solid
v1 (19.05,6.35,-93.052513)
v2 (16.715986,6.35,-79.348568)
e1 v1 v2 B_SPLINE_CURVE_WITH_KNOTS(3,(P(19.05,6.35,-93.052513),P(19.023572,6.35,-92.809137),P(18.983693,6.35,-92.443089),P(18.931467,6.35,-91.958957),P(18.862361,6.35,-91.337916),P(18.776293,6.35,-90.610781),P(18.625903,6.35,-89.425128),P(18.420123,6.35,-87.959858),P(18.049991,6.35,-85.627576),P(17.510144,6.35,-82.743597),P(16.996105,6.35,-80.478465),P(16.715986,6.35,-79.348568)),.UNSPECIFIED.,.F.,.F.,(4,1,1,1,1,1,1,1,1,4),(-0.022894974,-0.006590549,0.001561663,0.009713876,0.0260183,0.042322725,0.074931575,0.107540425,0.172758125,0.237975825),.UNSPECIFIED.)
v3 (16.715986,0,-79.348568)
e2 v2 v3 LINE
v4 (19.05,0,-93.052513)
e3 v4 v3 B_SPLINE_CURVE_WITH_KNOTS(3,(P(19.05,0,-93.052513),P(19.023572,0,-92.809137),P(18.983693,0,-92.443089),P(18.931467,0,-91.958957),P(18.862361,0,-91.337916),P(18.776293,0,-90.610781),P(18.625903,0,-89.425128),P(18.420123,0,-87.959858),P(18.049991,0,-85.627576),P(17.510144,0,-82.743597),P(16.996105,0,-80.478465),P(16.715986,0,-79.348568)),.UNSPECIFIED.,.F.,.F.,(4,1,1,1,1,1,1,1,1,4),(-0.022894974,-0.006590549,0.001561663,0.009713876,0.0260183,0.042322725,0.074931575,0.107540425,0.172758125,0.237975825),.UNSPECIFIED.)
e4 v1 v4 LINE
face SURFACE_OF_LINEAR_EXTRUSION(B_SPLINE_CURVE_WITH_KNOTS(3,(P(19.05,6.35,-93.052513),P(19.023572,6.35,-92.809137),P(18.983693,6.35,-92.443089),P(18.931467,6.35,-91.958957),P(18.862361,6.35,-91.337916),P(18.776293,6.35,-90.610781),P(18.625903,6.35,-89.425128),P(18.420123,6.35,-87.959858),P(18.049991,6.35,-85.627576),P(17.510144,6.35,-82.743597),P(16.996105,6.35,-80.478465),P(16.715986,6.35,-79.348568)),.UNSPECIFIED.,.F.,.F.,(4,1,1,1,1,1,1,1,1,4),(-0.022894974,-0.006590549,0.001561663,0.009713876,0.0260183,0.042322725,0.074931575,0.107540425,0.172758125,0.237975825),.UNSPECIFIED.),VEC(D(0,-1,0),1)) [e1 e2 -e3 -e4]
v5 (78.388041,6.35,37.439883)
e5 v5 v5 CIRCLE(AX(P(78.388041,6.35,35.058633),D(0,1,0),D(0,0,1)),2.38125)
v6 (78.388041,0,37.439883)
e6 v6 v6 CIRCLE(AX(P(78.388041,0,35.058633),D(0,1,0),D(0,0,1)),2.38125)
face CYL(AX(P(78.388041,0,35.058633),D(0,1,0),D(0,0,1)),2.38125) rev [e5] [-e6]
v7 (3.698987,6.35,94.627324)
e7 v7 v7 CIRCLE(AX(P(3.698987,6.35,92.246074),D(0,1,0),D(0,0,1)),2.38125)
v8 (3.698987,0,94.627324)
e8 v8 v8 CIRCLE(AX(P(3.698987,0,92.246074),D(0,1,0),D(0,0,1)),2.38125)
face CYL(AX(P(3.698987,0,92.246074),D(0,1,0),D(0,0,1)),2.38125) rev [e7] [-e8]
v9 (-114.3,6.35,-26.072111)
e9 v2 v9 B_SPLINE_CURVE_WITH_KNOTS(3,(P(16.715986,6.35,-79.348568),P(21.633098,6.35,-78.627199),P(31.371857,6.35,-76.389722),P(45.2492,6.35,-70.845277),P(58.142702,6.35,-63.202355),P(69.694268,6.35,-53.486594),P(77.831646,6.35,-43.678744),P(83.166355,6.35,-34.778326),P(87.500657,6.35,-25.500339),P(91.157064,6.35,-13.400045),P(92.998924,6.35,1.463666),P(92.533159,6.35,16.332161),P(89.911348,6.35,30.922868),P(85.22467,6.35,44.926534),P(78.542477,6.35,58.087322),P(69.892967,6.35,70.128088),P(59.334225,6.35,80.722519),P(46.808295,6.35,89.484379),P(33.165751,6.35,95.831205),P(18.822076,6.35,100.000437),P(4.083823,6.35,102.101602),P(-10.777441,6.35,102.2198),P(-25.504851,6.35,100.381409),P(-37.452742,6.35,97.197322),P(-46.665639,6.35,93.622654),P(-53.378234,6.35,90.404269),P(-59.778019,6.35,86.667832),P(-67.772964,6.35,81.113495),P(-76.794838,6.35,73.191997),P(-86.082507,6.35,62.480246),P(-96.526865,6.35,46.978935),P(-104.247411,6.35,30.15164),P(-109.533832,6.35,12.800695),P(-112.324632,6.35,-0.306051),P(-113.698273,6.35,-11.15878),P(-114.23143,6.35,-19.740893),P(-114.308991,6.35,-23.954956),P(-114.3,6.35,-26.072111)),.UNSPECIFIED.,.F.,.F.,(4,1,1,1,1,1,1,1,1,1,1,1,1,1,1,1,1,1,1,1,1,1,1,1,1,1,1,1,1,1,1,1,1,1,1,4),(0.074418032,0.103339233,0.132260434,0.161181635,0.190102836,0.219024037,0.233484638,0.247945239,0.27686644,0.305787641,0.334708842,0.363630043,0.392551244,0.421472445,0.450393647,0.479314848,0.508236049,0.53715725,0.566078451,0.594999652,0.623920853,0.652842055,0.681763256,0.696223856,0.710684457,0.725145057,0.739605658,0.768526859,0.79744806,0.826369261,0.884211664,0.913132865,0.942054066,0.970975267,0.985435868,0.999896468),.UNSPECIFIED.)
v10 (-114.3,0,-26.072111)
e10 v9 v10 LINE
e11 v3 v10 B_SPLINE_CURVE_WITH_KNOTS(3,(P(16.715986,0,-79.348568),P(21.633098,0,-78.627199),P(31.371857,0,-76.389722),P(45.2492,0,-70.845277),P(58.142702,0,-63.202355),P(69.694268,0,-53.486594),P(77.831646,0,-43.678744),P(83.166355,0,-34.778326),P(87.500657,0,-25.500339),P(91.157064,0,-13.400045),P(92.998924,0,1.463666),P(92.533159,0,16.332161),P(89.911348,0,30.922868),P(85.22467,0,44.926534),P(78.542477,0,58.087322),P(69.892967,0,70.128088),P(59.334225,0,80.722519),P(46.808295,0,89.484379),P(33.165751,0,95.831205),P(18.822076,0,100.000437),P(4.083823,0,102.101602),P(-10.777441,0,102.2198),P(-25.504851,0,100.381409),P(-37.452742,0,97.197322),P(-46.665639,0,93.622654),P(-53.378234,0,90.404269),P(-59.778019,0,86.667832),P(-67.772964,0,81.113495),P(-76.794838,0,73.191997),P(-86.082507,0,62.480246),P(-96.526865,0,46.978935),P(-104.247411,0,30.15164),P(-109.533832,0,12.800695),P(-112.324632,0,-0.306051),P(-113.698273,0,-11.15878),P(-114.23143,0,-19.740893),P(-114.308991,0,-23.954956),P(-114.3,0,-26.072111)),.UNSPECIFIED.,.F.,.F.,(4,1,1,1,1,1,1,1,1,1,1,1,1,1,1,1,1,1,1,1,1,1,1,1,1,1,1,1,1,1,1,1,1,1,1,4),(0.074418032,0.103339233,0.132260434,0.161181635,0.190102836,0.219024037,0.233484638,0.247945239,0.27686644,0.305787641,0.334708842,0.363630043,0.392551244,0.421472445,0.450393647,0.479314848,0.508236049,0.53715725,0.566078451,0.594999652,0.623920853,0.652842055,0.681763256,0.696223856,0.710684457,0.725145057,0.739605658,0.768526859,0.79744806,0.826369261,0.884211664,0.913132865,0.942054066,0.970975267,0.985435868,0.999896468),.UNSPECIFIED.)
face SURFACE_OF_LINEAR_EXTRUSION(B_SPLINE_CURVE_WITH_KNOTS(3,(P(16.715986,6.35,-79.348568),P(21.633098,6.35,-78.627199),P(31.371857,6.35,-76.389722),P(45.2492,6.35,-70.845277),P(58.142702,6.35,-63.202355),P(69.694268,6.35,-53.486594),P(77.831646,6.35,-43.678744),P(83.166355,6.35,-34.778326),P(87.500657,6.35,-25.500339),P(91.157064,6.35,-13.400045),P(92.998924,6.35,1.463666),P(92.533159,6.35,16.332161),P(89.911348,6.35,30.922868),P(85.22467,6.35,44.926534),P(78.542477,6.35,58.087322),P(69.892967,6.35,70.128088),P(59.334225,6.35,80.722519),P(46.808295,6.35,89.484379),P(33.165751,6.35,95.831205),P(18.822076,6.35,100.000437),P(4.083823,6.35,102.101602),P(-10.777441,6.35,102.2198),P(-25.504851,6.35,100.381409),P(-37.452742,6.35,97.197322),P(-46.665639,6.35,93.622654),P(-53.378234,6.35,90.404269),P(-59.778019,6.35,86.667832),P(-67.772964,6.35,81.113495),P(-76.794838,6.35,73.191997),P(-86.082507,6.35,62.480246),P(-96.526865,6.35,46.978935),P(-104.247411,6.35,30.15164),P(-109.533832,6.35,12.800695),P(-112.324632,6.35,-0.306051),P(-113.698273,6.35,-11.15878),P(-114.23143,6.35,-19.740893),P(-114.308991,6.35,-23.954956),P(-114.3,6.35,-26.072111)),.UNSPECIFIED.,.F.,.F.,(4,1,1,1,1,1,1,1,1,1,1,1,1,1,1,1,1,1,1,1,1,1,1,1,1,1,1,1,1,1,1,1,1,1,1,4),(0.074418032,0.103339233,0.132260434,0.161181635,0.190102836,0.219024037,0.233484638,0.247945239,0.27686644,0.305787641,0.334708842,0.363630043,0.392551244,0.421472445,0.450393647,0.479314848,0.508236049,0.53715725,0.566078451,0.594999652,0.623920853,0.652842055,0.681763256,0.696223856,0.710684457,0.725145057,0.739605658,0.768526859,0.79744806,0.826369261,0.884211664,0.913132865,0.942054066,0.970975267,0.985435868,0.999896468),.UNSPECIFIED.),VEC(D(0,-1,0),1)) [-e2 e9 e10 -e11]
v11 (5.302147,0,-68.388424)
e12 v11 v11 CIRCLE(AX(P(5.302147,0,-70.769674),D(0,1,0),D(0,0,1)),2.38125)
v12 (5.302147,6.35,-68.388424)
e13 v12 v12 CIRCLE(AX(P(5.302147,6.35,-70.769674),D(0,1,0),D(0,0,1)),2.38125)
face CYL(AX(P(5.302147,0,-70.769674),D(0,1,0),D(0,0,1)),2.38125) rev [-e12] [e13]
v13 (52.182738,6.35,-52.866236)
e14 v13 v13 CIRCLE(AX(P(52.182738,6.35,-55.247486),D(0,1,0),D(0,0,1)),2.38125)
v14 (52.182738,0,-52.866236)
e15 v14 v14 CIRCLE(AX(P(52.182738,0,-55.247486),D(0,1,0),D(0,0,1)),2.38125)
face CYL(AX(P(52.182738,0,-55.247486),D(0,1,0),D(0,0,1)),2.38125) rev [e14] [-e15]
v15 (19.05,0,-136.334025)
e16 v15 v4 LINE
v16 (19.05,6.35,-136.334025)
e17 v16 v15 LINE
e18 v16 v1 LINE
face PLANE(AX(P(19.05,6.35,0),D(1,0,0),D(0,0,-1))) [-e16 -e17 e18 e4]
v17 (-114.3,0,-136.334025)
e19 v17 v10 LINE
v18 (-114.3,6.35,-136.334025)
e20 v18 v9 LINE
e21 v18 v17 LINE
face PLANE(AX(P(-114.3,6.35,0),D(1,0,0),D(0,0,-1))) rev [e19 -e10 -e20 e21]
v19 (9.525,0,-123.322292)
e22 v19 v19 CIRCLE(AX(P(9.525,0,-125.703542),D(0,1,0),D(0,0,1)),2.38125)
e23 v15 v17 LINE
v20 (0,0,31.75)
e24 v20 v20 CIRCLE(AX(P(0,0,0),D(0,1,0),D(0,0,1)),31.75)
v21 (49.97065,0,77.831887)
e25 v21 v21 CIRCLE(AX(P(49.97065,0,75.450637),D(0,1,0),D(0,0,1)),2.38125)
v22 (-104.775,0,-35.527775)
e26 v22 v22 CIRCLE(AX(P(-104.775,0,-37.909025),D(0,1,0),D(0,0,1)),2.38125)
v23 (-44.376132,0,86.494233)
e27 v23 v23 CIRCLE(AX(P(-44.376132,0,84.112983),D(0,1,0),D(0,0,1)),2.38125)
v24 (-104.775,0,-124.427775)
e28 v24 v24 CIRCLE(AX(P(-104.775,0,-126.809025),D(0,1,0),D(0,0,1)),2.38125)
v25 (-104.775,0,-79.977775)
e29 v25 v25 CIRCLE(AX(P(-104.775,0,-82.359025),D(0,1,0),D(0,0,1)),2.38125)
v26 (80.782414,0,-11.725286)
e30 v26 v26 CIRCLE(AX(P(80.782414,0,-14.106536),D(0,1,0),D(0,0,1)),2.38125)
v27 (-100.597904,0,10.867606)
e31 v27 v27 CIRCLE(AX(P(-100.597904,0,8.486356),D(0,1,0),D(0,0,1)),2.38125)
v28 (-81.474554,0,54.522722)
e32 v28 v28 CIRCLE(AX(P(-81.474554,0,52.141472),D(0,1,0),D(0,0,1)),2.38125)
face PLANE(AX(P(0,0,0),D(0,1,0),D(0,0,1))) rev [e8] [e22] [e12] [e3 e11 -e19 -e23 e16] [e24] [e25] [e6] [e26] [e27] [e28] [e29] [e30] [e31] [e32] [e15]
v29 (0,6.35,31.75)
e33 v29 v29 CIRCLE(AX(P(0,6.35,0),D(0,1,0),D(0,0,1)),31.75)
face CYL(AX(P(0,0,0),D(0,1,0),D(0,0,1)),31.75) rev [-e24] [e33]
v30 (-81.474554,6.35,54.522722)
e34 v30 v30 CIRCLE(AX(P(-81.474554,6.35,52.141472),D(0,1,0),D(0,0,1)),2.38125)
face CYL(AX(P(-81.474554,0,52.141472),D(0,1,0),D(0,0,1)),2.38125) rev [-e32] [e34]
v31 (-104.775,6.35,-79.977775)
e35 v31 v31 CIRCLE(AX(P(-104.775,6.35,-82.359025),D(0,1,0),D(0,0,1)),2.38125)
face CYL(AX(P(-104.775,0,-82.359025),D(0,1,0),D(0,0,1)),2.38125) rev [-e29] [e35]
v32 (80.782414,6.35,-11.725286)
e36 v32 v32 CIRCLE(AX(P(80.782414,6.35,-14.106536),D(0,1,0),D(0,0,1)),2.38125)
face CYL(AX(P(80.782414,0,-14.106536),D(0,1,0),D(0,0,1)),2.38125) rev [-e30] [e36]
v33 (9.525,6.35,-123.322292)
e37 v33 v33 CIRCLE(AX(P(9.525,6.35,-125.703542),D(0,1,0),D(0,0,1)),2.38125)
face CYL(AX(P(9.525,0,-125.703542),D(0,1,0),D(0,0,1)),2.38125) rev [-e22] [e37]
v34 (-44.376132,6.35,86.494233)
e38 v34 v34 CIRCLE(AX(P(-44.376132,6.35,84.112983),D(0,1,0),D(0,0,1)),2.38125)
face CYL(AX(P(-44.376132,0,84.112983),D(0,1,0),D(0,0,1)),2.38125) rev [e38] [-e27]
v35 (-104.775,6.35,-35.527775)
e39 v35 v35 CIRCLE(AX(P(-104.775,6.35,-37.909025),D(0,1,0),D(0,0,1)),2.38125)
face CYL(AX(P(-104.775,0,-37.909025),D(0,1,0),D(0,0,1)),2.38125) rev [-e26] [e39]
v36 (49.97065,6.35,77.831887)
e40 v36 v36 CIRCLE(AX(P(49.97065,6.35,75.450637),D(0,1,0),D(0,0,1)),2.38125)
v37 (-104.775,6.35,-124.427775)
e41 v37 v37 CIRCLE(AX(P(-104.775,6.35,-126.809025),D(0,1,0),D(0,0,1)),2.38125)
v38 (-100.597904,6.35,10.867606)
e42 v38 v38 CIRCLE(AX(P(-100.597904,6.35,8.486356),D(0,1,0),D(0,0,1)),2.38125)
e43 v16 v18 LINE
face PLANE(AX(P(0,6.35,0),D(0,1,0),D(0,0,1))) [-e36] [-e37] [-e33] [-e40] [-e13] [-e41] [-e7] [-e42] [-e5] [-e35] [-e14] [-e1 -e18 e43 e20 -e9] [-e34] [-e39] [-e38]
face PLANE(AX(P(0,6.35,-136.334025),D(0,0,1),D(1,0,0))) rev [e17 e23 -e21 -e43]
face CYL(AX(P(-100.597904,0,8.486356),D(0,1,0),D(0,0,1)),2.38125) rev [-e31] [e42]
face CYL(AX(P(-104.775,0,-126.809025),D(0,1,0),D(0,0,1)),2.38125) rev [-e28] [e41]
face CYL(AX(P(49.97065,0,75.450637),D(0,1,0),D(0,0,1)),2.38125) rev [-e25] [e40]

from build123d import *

# Parameters (mm, degrees)
BOSS_EXTRUDE1_DEPTH   = 6.35
FILLET1_R             = 2.54
FILLET2_R             = 0.79375
SKETCH4_R             = 2.38125
CUT_EXTRUDE3_DEPTH    = 6.35
CRVPATTERN1_OUTLINE_R = 2.38125
CRVPATTERN1_DEPTH     = 6.35
SKETCH5_R             = 31.75
BOSS_EXTRUDE2_DEPTH   = 6.35


# Read off the part's stored shape, not the designer's step: CrvPattern1
with BuildPart() as part:
    # Sketch1 → Boss-Extrude1 (new body)
    with BuildSketch(Plane(origin=(0, 0, 0), x_dir=(1, 0, 0), z_dir=(0, 1, 0))):
        with BuildLine():
            Line((0, 136.334024978), (0, 94.083801247))
            add(Edge.make_bspline(
                [(0, 94.083801247), (-2.431386336, 71.693275709), (-15.75825593, 58.230430146)],
                knots=[0, 0, 0, 1, 1, 1], degree=2))
            add(Edge.make_bspline(
                [(-15.75825593, 58.230430146), (12.928997408, 67.764135595), (70.60122301, 46.247103047), (77.540383798, -26.213493844), (40.518788725, -85.775261158), (-67.055108572, -88.304279922), (-95.415707681, -10.214485927), (-95.25, 26.030170649)],
                knots=[0, 0, 0, 0, 0.227546357, 0.356849793, 0.49581236, 0.710996888, 1, 1, 1, 1], degree=3))
            Line((-95.25, 26.030170649), (-95.25, 136.334024978))
            Line((-95.25, 136.334024978), (-114.3, 136.334024978))
            Line((-114.3, 136.334024978), (-114.3, 26.072111228))
            add(Edge.make_bspline(
                [(16.715986391, 79.348568009), (21.633097871, 78.62719896), (31.371857261, 76.389721894), (45.249200497, 70.845276961), (58.14270202, 63.202354702), (69.694268499, 53.486594004), (77.831645881, 43.678743898), (83.1663553, 34.778326042), (87.500656656, 25.500338712), (91.157064432, 13.400044888), (92.998924079, -1.463666218), (92.533158628, -16.332160856), (89.911348046, -30.922868008), (85.224669703, -44.926534482), (78.5424766, -58.087321563), (69.892966554, -70.128088223), (59.334225085, -80.722518946), (46.808294676, -89.48437896), (33.165750854, -95.831204537), (18.8220758, -100.00043745), (4.083822861, -102.101602424), (-10.777441223, -102.219799961), (-25.504851136, -100.381408636), (-37.452741503, -97.197322494), (-46.66563909, -93.622653994), (-53.378233983, -90.404269128), (-59.778019163, -86.667831837), (-67.772964247, -81.11349497), (-76.794838317, -73.191996697), (-86.082507199, -62.480245978), (-96.526865188, -46.978935087), (-104.24741081, -30.151640125), (-109.53383183, -12.800694626), (-112.324631517, 0.306051107), (-113.698273493, 11.158780223), (-114.231429958, 19.740893087), (-114.308990648, 23.9549561), (-114.3, 26.072111228)],
                knots=[0.074418032, 0.074418032, 0.074418032, 0.074418032, 0.103339233, 0.132260434, 0.161181635, 0.190102836, 0.219024037, 0.233484638, 0.247945239, 0.27686644, 0.305787641, 0.334708842, 0.363630043, 0.392551244, 0.421472445, 0.450393647, 0.479314848, 0.508236049, 0.53715725, 0.566078451, 0.594999652, 0.623920853, 0.652842055, 0.681763256, 0.696223856, 0.710684457, 0.725145057, 0.739605658, 0.768526859, 0.79744806, 0.826369261, 0.884211664, 0.913132865, 0.942054066, 0.970975267, 0.985435868, 0.999896468, 0.999896468, 0.999896468, 0.999896468], degree=3))
            add(Edge.make_bspline(
                [(19.05, 93.052513121), (19.023571763, 92.809136693), (18.983692868, 92.443089224), (18.931467162, 91.958957236), (18.862360798, 91.337915751), (18.776292871, 90.610780885), (18.625902721, 89.42512839), (18.420122868, 87.959858448), (18.049990563, 85.627575808), (17.510143571, 82.743597147), (16.996105499, 80.478464636), (16.715986391, 79.348568009)],
                knots=[-0.022894974, -0.022894974, -0.022894974, -0.022894974, -0.006590549, 0.001561663, 0.009713876, 0.0260183, 0.042322725, 0.074931575, 0.107540425, 0.172758125, 0.237975825, 0.237975825, 0.237975825, 0.237975825], degree=3))
            Line((19.05, 93.052513121), (19.05, 136.334024978))
            Line((19.05, 136.334024978), (0, 136.334024978))
        make_face()
    extrude(amount=BOSS_EXTRUDE1_DEPTH)

    # Fillet1
    fillet1_edges = [part.edges().sort_by_distance(p)[0] for p in [
        (0, 3.175, -94.083801247),
        (-95.25, 3.175, -26.030170649),
    ]]
    fillet(fillet1_edges, radius=FILLET1_R)

    # Fillet2
    fillet2_edges = [part.edges().sort_by_distance(p)[0] for p in [
        (-15.75825593, 3.175, -58.230430146),
    ]]
    fillet(fillet2_edges, radius=FILLET2_R)

    # Sketch4 → Cut-Extrude3 (cut)
    with BuildSketch(Plane(origin=(0, 6.35, 0), x_dir=(1, 0, 0), z_dir=(0, 1, 0))):
        with Locations(Location((-104.775, 126.809024978, 0), (0, 0, 270))):
            Circle(SKETCH4_R)
    extrude(amount=-CUT_EXTRUDE3_DEPTH, mode=Mode.SUBTRACT)

    # CrvPattern1 outline → CrvPattern1 (cut)
    with BuildSketch(Plane(origin=(0, 0, 0), x_dir=(1, 0, 0), z_dir=(0, 1, 0))):
        with Locations((-104.775, 82.359024978)):
            Circle(CRVPATTERN1_OUTLINE_R)
        with Locations((-104.775, 37.909024978)):
            Circle(CRVPATTERN1_OUTLINE_R)
        with Locations((-100.597903535, -8.486356178)):
            Circle(CRVPATTERN1_OUTLINE_R)
        with Locations((-81.474554, -52.141471765)):
            Circle(CRVPATTERN1_OUTLINE_R)
        with Locations((-44.376132313, -84.112983027)):
            Circle(CRVPATTERN1_OUTLINE_R)
        with Locations((3.698987105, -92.246074321)):
            Circle(CRVPATTERN1_OUTLINE_R)
        with Locations((49.97064989, -75.450636534)):
            Circle(CRVPATTERN1_OUTLINE_R)
        with Locations((78.388040736, -35.058632959)):
            Circle(CRVPATTERN1_OUTLINE_R)
        with Locations((80.782414242, 14.106535639)):
            Circle(CRVPATTERN1_OUTLINE_R)
        with Locations((52.182738061, 55.247486043)):
            Circle(CRVPATTERN1_OUTLINE_R)
        with Locations((5.302146984, 70.7696737)):
            Circle(CRVPATTERN1_OUTLINE_R)
        with Locations((9.525, 125.703541591)):
            Circle(CRVPATTERN1_OUTLINE_R)
    extrude(amount=CRVPATTERN1_DEPTH, mode=Mode.SUBTRACT)

    # Sketch5 → Boss-Extrude2 (add)
    with BuildSketch(Plane(origin=(0, 6.35, 0), x_dir=(1, 0, 0), z_dir=(0, 1, 0))):
        with BuildLine():
            Line((0, 94.222341016), (0, 136.334024978))
            Line((0, 136.334024978), (-95.25, 136.334024978))
            Line((-95.25, 136.334024978), (-95.25, 26.035946481))
            Line((-95.25, 26.035946481), (-95.250025994, 26.02445519))
            add(Edge.make_bspline(
                [(-95.250025994, 26.02445519), (-95.413998653, -10.219191455), (-67.052567731, -88.304220188), (40.518788725, -85.775261158), (77.540383798, -26.213493844), (70.704250586, 45.171261183), (15.28602209, 66.863348491), (-12.949636793, 59.083069401)],
                knots=[1.5191e-05, 1.5191e-05, 1.5191e-05, 1.5191e-05, 0.289003112, 0.50418764, 0.643150207, 0.772453643, 0.992638541, 0.992638541, 0.992638541, 0.992638541], degree=3))
            ThreePointArc((-12.949636793, 59.083069401), (-13.833627454, 59.427668219), (-13.755858665, 60.373257902))
            add(Edge.make_bspline(
                [(-13.755858665, 60.373257902), (-2.2817326, 73.386271149), (-0.015296893, 93.943999106)],
                knots=[0, 0, 0, 1, 1, 1], degree=2))
            ThreePointArc((-0.015296893, 93.943999106), (-0.003827106, 94.082960051), (0, 94.222341016))
        make_face()
        with Locations(Location((0, 0, 0), (0, 0, 270))):
            Circle(SKETCH5_R, mode=Mode.SUBTRACT)
    extrude(amount=-BOSS_EXTRUDE2_DEPTH)


solid = part.part
